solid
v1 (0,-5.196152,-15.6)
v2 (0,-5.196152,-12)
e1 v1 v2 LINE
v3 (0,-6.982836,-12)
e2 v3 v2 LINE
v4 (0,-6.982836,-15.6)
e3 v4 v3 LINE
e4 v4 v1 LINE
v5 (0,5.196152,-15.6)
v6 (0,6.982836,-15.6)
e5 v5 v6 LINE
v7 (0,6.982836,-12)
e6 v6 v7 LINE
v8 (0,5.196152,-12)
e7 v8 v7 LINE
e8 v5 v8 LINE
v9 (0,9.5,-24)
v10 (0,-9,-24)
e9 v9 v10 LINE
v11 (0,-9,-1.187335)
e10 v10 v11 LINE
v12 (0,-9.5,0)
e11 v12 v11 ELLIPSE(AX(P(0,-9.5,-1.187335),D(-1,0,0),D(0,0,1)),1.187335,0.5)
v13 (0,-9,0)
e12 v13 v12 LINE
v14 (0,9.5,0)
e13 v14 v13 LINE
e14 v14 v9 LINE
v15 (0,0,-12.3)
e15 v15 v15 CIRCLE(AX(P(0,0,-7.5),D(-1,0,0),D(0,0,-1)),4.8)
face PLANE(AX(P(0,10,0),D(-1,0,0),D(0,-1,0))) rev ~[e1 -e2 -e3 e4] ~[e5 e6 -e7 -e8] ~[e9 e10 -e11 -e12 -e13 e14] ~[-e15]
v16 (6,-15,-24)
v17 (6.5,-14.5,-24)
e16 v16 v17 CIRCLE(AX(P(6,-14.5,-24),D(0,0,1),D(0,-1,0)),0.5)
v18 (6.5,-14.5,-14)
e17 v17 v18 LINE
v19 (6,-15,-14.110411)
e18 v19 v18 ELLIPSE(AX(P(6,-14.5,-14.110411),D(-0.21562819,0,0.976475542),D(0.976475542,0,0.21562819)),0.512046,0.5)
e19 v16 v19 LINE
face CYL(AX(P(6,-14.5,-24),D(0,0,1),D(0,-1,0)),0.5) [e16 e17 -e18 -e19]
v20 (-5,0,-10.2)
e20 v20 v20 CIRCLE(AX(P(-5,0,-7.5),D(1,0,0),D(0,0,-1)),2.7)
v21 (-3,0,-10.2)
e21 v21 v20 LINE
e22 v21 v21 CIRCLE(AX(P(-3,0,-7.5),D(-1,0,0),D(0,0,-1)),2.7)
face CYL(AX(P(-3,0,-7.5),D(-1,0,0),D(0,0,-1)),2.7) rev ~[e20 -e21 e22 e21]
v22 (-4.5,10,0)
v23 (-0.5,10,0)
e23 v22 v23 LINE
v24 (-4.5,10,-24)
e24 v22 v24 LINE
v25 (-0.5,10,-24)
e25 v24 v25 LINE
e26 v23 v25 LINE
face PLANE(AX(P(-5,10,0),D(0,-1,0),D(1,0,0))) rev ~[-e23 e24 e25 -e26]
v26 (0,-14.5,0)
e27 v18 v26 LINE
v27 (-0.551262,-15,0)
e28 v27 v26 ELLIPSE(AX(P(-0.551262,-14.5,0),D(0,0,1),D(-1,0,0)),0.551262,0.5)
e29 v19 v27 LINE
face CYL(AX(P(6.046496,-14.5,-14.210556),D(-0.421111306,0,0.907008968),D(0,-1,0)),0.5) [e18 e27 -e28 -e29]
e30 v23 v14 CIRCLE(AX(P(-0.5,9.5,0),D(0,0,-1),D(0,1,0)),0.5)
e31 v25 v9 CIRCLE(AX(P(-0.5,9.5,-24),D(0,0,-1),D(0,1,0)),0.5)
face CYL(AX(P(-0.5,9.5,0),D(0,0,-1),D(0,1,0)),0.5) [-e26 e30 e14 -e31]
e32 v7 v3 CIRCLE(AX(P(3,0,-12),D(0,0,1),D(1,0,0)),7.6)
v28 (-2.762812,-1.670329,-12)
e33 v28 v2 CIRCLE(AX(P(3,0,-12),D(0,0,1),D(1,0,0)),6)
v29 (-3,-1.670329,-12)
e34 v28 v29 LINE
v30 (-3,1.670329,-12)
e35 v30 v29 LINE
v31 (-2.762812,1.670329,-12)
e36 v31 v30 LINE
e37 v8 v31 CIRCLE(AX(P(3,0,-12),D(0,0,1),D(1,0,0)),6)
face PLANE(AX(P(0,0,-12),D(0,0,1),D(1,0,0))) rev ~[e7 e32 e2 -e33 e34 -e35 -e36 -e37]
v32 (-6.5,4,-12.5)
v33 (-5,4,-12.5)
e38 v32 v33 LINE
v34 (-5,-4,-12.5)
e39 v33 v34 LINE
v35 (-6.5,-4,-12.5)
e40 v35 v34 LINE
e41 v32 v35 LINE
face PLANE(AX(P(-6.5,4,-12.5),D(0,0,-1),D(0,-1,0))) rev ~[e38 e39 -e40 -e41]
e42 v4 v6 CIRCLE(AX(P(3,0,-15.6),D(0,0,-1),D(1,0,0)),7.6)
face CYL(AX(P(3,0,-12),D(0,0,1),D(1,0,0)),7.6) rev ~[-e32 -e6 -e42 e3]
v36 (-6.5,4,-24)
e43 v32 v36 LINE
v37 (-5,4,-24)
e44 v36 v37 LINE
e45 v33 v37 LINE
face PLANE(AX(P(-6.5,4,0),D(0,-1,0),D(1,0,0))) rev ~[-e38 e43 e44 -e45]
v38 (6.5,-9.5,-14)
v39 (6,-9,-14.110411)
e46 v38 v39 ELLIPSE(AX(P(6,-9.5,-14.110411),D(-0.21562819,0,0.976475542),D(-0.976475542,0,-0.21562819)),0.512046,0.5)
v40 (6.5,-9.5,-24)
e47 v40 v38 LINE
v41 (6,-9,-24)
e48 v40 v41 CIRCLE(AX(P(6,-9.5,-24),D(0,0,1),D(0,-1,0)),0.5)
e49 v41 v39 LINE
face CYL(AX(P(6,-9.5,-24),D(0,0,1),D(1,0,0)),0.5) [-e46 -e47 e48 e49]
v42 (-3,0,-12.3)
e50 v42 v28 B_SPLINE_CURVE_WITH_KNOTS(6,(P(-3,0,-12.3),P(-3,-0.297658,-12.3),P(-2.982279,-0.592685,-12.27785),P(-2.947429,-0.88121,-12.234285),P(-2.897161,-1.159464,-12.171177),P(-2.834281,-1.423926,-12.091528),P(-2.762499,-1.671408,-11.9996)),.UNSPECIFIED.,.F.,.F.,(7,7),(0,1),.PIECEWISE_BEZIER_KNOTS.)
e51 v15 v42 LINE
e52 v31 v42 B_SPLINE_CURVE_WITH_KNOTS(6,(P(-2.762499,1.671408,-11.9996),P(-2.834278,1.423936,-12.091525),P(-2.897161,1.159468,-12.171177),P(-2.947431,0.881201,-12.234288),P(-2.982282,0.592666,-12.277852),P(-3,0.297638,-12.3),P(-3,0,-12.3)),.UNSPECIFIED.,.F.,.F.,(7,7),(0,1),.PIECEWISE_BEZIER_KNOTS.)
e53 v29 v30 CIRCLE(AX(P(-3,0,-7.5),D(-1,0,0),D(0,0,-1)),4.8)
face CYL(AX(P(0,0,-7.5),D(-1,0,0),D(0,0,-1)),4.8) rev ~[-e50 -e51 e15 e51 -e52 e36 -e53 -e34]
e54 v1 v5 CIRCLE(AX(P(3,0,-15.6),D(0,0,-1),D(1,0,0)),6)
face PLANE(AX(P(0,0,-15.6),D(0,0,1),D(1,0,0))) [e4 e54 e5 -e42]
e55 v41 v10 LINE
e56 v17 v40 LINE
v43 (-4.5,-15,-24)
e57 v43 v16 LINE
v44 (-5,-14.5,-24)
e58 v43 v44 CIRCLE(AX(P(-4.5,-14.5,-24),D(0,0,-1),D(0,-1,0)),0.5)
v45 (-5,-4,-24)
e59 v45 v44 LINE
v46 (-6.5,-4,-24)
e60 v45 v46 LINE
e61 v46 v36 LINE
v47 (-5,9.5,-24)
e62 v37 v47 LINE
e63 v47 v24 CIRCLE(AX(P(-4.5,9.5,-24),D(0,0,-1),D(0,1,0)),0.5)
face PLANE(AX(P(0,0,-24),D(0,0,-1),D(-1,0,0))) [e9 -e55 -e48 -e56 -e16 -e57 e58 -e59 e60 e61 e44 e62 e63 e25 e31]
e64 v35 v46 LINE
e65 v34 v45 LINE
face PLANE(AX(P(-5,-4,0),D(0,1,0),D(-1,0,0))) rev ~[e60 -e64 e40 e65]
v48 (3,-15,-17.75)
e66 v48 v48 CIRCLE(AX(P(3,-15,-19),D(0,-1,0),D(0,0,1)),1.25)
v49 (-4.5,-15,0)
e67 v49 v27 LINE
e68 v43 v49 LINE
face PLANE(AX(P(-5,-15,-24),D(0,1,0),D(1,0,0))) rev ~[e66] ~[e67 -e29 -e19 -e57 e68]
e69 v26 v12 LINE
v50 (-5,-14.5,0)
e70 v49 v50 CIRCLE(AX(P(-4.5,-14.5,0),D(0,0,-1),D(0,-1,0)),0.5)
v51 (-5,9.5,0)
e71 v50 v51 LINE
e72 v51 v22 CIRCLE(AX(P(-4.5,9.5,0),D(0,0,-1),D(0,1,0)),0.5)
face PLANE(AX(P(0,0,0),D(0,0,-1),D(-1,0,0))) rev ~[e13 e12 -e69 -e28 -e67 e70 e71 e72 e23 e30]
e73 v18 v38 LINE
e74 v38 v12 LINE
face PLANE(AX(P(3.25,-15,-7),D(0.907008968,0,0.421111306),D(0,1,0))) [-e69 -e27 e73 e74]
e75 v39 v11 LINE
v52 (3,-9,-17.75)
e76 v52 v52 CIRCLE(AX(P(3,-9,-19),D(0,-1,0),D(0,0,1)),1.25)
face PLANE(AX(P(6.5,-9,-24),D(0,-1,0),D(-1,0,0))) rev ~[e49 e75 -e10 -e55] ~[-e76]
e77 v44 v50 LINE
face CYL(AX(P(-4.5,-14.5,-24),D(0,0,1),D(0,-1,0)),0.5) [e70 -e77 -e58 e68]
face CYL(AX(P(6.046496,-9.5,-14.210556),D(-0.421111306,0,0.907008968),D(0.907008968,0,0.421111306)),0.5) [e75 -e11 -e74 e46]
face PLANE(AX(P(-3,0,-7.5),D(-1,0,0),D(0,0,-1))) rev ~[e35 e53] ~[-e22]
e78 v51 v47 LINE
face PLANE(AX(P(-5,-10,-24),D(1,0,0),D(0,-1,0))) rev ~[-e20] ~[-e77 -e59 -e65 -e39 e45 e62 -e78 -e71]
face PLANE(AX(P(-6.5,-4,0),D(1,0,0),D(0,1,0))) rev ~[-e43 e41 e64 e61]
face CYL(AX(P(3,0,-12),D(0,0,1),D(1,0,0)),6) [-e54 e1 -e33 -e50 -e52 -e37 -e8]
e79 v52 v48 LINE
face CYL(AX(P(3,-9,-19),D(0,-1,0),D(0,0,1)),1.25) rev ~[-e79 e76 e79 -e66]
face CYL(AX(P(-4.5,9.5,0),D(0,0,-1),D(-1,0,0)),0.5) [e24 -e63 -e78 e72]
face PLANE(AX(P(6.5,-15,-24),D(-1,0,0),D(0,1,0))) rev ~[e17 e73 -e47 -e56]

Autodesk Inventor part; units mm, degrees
ref_plane "YZ Plane" through (0, 0, 0) normal (1, 0, 0) x (0, 1, 0)
ref_plane "XZ Plane" through (0, 0, 0) normal (0, 1, 0) x (-1, 0, 0)
sketch "Sketch1" plane through (0, 0, 0) normal (0, 0, 1) x (1, 0, 0)
  line L0 (0, 10) -> (0, -10)
  line L1 (0, -10) -> (-5, -10)
  line L2 (-5, -10) -> (-5, -4)
  line L3 (-5, -4) -> (-6.5, -4)
  line L4 (-6.5, -4) -> (-6.5, 4)
  line L5 (-6.5, 4) -> (-5, 4)
  line L6 (-5, 4) -> (-5, 10)
  line L7 (-5, 10) -> (0, 10)
  line L8 (0, 0) -> (-15.0545, 0) construction
  point P0 (-6.5, 0)
  dimension "d0" = 1.5
  dimension "d1" = 8
  dimension "d2" = 5
  dimension "d3" = 20
extrude "Extrusion1" add sketch "Sketch1" against normal blind 24
sketch "Sketch2" plane through (0, -10, 0) normal (1, 0, 0) x (0, 0, -1)
  line L0 (0, 10) -> (20.9955, 10) construction
  point P0 (7.5, 10)
  dimension "d6" = 7.5
hole "Hole1" at (0, 0, -7.5) direction (-1, 0, 0) diameter 5.4 end through all counterbore diameter 9.6 counterbore depth 3
ref_plane "Work Plane1" through (0, 0, -12) normal (0, 0, 1) x (1, 0, 0)
sketch "Sketch3" plane through (0, 0, -12) normal (0, 0, 1) x (1, 0, 0)
  line L0 (0, 0) -> (8.806, 0) construction
  circle A0 centre (3, 0) radius 6
  circle A1 centre (3, 0) radius 7.6
  line L1 (0, 10) -> (0, -10) projected
  dimension "d15" = 12
  dimension "d16" = 1.6
  dimension "d17" = 3
extrude "Extrusion2" cut sketch "Sketch3" against normal blind 3.6 contours A0 L1 A1 | A0 L1 A1
sketch "Sketch4" plane through (0, 0, -24) normal (0, 0, -1) x (-1, 0, 0)
  line L0 (0, -10) -> (5, -10) projected
  line L1 (0, 10) -> (0, -10) projected
  line L2 (5, -15) -> (-6.5, -15)
  line L3 (-6.5, -15) -> (-6.5, -9)
  line L4 (-6.5, -9) -> (0, -9)
  line L5 (0, 10) -> (0, -10) projected
  line L6 (0, -9) -> (0, -10)
  line L7 (0, -10) -> (5, -10) projected
  line L8 (0, -10) -> (5, -10)
  line L9 (5, -10) -> (5, -15)
  point P0 (0, 0)
  dimension "d20" = 15
  dimension "d21" = 6.5
  dimension "d22" = 9
extrude "Extrusion3" add sketch "Sketch4" against normal up to surface (24 mm away)
sketch "Sketch5" plane through (0, -9, -24) normal (0, 1, 0) x (1, 0, 0)
  line L0 (6.5, 0) -> (6.5, -24) projected
  line L1 (6.5, -25) -> (0, -25) projected
  line L2 (0, 0) -> (6.5, 0) projected
  point P0 (0, -24)
  point P1 (0, -24)
  point P2 (6.5, -12.5)
  point P3 (3, -5)
  dimension "d25" = 3.5
  dimension "d33" = 5
hole "Hole2" at (3, -9, -19) direction (0, -1, 0) diameter 2.5 end through all
sketch "Sketch7" plane through (-6.5, -4, 0) normal (-1, 0, 0) x (0, 0, 1)
  circle A0 centre (-7.5, 4) radius 2.7 projected
  line L0 (0, 0) -> (0, 8) projected
  line L1 (0, 8) -> (-24, 8) projected
  line L2 (-24, 0) -> (-24, 8) projected
  line L3 (0, 0) -> (-24, 0) projected
  line L4 (0, 0) -> (-24, 0) projected
  line L5 (0, 8) -> (-12.5, 8)
  line L6 (-12.5, 8) -> (-12.5, 0)
  line L7 (-12.5, 0) -> (0, 0)
  line L8 (0, 0) -> (0, 8)
  point P0 (0, 4)
  dimension "d37" = 5
extrude "Extrusion5" cut sketch "Sketch7" against normal up to surface (1.5 mm away) contours L3 L6 L1 L0
fillet "Fillet1" radius 0.5 2 edges at (-5, 10, -12) (0, 10, -12)
chamfer "Chamfer1" distance 14 distance2 6.5 1 edges at (6.5, -12, 0) measured on face at (6.5, -11, -16)
fillet "Fillet4" radius 0.5 4 edges at (3.25, -9, -7) (6.5, -9, -19) (6.5, -15, -19) (3.25, -15, -7)
fillet "Fillet5" radius 0.5 1 edges at (-5, -15, -12)
properties part number "Y End Stop Bracket" material "PC/ABS Plastic"
